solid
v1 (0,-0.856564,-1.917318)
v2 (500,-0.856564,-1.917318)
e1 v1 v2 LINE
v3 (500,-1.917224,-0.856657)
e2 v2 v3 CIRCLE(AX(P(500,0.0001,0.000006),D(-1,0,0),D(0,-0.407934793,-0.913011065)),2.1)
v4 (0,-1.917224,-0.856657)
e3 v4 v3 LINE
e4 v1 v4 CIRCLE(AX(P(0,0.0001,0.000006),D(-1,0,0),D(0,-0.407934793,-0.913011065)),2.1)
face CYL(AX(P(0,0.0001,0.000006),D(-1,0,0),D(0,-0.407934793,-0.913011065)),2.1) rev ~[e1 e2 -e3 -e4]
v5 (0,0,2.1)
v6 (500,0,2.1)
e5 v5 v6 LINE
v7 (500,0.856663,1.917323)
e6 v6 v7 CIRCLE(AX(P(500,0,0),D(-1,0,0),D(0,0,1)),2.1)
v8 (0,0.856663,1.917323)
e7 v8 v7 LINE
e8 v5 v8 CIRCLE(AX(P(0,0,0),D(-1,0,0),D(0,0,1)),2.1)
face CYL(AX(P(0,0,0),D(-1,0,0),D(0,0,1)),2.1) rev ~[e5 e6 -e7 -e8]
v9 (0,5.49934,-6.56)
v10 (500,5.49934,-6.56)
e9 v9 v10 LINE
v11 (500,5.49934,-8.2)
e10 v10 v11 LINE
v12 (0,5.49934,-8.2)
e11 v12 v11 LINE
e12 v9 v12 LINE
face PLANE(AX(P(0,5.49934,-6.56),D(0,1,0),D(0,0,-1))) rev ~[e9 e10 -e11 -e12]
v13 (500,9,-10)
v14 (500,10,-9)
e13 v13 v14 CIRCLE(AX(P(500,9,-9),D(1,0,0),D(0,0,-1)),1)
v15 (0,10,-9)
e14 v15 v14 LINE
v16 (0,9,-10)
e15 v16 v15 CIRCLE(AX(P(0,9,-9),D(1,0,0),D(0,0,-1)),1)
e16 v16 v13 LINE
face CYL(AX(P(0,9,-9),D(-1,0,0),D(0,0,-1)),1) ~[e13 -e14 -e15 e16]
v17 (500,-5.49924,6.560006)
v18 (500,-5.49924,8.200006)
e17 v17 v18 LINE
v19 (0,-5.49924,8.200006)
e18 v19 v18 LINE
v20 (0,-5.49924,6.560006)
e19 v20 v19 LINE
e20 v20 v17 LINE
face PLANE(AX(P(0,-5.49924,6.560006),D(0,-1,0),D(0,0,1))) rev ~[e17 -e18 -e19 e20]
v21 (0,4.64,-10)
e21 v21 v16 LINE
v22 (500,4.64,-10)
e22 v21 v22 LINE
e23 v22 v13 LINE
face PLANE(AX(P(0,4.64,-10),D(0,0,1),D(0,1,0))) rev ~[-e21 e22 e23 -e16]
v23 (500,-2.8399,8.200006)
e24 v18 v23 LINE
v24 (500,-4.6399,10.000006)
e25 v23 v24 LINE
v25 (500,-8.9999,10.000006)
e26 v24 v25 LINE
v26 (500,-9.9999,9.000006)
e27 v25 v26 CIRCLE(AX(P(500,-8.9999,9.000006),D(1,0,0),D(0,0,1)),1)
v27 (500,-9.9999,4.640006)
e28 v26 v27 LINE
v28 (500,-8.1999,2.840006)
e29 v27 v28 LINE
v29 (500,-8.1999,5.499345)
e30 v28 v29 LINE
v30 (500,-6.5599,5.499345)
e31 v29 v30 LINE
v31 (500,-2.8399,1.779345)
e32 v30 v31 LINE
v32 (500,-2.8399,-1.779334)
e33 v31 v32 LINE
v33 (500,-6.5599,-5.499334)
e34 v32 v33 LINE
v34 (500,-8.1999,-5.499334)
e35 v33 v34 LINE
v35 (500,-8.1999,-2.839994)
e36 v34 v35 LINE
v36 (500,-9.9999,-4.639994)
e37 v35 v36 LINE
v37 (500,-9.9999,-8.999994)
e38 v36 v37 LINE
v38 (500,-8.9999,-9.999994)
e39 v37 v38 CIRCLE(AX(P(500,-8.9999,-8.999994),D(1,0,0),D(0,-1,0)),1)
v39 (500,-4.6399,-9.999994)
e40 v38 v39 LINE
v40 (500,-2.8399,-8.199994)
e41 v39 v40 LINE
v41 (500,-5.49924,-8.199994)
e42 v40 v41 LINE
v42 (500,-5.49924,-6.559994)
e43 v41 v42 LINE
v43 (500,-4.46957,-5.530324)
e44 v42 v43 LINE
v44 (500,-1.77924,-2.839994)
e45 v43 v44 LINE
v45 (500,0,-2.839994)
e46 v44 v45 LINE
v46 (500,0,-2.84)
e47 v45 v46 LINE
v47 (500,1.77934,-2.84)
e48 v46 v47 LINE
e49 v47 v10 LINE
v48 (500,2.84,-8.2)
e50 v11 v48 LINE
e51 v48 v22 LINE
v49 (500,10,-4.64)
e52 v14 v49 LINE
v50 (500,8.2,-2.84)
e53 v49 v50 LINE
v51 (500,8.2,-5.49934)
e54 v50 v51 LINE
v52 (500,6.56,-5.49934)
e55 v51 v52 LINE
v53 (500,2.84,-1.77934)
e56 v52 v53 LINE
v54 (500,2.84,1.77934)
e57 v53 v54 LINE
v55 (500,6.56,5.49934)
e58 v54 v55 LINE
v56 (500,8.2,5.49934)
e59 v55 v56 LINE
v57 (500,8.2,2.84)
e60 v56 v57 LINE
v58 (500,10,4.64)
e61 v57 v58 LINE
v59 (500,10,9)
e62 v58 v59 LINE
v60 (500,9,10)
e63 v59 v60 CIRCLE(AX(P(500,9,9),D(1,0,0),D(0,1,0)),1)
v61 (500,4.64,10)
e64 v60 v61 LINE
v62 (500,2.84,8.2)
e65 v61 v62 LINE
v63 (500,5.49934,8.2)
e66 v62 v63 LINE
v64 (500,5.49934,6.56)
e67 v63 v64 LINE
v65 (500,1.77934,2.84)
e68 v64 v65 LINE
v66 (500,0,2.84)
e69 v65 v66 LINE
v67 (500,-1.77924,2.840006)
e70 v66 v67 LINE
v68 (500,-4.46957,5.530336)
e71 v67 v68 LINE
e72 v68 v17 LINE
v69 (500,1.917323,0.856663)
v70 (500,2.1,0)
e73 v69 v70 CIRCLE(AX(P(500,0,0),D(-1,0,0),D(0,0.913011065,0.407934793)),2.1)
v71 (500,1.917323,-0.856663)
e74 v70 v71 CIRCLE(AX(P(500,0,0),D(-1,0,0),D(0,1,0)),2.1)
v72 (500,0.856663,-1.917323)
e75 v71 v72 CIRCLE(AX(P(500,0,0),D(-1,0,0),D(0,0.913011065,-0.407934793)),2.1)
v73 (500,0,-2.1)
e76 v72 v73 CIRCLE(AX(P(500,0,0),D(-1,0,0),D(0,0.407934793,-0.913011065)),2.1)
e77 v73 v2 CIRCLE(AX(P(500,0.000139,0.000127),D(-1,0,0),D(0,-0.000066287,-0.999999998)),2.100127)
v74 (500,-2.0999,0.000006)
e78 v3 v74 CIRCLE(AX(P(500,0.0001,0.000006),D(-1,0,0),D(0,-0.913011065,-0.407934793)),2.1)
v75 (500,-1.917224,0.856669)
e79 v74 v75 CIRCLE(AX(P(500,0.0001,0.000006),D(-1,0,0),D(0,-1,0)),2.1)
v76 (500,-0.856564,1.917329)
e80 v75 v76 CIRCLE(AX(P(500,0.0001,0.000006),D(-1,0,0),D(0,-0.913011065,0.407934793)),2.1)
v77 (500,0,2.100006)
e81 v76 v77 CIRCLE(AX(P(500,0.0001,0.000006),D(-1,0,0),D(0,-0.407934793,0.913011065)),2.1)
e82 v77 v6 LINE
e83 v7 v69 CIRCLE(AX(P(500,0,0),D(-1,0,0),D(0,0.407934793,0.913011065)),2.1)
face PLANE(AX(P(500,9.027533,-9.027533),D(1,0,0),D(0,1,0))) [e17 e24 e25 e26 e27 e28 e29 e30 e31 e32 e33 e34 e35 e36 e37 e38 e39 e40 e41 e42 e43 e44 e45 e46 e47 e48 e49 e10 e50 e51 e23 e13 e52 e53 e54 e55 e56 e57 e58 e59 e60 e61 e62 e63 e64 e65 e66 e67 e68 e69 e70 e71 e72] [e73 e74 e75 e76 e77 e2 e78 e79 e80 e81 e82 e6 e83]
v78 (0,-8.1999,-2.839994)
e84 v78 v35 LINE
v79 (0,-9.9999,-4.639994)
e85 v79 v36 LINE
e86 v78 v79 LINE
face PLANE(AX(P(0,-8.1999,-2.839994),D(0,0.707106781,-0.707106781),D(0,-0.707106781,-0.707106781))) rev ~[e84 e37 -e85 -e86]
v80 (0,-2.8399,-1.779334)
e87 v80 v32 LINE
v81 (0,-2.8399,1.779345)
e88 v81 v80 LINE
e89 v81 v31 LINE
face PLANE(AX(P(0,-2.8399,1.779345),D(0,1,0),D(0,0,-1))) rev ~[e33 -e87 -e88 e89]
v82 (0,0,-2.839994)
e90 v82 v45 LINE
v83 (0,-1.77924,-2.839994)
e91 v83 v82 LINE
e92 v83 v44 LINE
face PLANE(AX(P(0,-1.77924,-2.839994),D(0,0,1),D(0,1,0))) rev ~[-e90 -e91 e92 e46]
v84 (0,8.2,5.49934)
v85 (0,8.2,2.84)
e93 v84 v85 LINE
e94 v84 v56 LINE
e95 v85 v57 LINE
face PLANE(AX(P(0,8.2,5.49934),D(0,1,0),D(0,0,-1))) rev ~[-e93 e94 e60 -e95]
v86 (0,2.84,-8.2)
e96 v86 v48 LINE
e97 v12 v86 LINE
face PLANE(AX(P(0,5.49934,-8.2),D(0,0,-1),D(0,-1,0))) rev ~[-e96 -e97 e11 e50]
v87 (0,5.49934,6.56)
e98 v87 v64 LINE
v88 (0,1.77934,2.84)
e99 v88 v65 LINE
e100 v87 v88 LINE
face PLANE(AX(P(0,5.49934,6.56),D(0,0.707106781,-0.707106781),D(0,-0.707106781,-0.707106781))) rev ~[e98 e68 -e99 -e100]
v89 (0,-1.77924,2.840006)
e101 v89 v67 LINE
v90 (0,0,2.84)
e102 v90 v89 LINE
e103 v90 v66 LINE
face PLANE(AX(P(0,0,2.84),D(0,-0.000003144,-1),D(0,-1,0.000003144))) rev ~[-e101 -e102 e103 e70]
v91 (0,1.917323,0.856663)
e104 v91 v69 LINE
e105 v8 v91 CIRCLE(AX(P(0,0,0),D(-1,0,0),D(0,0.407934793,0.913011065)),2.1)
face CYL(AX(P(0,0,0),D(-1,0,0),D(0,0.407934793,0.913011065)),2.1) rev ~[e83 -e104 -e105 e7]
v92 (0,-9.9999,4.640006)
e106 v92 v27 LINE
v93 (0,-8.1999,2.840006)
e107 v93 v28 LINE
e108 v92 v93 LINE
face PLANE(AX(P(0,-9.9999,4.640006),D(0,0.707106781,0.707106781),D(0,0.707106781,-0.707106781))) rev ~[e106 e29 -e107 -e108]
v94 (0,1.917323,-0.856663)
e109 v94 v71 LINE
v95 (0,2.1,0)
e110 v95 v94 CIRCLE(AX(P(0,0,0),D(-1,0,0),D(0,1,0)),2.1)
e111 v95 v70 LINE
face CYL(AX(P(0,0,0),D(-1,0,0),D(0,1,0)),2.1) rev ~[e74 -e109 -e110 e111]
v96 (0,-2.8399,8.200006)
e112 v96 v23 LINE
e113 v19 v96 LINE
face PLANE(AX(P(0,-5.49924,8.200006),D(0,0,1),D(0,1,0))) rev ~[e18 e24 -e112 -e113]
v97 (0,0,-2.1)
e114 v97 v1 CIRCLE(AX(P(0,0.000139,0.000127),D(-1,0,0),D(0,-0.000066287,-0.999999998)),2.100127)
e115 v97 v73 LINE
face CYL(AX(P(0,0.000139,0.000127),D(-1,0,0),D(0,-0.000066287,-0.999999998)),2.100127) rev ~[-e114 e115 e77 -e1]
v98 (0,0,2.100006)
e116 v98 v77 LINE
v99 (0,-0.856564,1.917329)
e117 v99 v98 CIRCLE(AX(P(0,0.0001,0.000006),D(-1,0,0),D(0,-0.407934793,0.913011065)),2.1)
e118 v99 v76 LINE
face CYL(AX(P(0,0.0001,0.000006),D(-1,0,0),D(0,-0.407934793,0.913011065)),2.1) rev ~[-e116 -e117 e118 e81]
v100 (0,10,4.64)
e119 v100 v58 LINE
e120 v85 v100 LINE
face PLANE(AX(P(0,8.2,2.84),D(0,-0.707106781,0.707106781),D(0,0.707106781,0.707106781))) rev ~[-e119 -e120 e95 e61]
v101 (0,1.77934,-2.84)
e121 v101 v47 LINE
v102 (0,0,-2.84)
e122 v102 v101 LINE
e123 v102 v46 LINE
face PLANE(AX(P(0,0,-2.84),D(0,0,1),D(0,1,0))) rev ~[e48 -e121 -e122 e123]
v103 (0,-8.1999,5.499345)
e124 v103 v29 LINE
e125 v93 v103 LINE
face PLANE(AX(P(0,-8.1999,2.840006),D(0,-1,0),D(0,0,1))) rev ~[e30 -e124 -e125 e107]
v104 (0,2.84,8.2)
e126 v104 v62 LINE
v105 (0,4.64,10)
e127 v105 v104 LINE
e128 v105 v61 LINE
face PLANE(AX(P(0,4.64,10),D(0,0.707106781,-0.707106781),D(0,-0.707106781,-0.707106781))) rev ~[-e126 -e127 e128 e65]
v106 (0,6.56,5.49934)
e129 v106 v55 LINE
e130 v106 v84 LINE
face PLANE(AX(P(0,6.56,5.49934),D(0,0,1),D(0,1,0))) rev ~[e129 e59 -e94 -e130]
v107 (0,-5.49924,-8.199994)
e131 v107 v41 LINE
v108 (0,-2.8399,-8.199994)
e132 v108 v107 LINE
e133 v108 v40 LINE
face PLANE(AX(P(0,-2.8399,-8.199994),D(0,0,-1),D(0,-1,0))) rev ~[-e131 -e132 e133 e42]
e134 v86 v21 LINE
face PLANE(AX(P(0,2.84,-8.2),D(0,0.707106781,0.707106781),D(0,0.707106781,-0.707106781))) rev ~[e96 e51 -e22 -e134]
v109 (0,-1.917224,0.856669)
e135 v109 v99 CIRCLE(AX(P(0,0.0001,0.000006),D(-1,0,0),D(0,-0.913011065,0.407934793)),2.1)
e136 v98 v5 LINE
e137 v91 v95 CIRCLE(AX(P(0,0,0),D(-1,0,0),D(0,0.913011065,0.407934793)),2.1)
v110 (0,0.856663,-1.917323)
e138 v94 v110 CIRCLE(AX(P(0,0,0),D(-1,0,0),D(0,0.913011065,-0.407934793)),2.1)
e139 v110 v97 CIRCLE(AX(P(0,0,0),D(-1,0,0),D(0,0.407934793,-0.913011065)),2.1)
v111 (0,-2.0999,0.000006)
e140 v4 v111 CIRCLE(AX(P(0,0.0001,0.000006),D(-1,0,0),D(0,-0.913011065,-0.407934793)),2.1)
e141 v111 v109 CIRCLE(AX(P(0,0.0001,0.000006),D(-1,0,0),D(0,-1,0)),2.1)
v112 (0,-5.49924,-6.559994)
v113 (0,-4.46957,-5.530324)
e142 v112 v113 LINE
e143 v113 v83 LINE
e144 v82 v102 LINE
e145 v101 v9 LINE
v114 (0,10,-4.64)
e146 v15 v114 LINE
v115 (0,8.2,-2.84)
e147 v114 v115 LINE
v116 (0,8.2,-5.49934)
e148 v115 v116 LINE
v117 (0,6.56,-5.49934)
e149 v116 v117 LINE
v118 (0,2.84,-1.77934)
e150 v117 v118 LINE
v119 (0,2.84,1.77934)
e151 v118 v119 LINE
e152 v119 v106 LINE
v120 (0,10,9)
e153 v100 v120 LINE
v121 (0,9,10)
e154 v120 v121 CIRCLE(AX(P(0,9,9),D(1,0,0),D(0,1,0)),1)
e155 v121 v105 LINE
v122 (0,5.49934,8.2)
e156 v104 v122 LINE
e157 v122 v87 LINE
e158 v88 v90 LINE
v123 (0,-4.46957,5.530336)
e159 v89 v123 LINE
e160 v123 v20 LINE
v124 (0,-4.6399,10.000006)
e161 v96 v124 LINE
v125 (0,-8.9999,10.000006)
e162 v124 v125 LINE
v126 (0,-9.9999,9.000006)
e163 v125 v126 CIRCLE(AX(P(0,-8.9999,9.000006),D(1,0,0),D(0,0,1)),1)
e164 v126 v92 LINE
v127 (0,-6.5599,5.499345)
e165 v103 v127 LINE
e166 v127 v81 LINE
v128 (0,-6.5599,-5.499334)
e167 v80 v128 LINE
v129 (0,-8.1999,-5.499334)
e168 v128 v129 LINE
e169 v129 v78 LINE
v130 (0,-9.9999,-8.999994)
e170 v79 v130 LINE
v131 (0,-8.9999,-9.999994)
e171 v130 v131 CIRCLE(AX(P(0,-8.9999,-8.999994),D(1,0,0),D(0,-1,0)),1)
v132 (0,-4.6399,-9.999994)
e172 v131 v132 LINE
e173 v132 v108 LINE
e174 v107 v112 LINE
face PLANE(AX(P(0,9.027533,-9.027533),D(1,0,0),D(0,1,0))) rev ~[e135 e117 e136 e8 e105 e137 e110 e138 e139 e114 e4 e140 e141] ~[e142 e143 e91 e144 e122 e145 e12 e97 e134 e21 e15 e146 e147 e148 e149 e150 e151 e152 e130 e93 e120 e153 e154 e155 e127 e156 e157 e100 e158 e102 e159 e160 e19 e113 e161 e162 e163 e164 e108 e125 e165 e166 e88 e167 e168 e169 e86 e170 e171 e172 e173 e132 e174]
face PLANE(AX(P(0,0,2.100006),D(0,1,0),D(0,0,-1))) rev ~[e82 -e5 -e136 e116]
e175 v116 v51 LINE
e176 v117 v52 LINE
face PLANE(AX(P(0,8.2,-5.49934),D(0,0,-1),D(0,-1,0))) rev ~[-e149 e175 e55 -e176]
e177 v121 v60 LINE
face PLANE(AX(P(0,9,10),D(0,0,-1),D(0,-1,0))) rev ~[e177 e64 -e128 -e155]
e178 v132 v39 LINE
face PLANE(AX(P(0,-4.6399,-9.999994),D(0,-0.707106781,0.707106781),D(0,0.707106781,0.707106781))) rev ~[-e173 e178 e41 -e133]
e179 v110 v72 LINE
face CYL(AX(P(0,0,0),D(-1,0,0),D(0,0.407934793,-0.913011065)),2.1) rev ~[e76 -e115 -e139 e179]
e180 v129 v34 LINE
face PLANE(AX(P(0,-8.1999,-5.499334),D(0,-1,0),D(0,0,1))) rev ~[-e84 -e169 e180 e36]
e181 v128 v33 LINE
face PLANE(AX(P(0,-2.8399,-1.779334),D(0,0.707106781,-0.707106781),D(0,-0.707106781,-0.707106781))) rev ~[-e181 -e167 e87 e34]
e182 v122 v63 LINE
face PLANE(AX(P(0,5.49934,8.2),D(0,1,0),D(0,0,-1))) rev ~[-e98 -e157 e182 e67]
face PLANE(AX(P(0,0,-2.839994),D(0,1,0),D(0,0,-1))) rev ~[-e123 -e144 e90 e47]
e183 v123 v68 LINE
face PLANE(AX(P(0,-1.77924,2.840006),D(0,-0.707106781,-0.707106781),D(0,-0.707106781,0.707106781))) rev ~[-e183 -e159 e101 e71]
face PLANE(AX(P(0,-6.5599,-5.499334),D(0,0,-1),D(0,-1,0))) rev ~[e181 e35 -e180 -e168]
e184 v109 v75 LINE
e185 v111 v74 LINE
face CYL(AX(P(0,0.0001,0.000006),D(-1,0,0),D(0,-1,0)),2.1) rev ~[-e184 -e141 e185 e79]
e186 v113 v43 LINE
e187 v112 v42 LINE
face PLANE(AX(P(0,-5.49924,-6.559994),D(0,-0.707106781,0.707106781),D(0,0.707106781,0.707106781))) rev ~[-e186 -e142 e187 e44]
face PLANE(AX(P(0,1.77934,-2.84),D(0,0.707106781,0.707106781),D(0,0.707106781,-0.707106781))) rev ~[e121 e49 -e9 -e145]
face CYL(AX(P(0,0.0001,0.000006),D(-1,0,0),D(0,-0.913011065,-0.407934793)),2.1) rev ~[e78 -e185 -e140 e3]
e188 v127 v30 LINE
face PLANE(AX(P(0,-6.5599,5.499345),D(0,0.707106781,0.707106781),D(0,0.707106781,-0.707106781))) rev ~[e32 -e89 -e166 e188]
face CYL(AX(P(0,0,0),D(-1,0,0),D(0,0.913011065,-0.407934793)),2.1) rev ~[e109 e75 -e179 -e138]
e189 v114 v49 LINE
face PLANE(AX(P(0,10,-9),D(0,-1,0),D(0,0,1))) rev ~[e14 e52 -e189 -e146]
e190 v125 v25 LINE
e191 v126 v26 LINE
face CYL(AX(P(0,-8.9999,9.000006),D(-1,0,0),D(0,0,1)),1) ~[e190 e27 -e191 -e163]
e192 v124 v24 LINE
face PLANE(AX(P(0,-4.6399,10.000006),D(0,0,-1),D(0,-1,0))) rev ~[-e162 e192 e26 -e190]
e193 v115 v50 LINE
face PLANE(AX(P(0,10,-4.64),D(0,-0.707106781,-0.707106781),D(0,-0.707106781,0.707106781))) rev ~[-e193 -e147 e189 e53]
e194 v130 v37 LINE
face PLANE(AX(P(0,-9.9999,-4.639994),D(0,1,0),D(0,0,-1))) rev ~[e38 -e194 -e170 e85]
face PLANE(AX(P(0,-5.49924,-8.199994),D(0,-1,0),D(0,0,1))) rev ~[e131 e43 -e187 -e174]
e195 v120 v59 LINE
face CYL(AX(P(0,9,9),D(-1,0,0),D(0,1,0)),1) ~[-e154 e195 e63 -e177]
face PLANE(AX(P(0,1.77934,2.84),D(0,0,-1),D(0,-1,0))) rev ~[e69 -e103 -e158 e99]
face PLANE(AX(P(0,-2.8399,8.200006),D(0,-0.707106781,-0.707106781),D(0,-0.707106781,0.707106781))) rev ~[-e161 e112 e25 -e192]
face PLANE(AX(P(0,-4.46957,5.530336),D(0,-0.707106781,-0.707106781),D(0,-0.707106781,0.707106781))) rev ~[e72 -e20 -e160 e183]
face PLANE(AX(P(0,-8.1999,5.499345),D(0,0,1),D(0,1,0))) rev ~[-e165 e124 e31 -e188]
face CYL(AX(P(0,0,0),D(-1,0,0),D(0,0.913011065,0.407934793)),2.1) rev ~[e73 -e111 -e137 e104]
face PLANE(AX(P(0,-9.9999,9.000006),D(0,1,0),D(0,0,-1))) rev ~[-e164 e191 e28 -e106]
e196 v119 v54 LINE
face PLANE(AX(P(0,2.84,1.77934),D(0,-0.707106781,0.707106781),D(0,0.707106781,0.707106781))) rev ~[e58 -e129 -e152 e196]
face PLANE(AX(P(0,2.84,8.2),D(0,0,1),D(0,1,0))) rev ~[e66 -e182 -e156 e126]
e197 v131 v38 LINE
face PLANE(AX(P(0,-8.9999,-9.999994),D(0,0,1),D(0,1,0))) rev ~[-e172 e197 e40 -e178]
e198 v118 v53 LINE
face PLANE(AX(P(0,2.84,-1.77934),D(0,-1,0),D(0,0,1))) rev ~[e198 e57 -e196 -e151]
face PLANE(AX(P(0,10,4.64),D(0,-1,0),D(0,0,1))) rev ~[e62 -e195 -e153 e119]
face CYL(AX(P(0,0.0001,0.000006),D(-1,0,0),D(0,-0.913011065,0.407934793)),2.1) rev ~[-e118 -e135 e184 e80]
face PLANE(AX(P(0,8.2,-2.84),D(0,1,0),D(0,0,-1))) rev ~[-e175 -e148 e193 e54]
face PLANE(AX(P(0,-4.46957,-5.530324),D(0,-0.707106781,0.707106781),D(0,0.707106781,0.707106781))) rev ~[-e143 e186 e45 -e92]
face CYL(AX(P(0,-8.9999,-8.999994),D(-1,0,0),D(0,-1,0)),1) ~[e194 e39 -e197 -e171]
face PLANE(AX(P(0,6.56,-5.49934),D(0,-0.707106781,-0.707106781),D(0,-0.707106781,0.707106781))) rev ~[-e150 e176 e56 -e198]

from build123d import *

# Parameters (mm, degrees)
F1_DEPTH = 500


# Not quite as in the source:
# - ends of sketch curves that miss each other by under 0.0002 mm in the source are joined


with BuildPart() as f1:
    # F0 (on Right) → F1 (new body)
    with BuildSketch(Plane.YZ):
        with BuildLine():
            Line((8.2, -10), (9, -10))
            ThreePointArc((9, -10), (9.7071067812, -9.7071067812), (10, -9))
            Line((10, -9), (10, -8.2))
            Line((10, -8.2), (8.2, -8.2))
            Line((8.2, -8.2), (8.2, -10))
        make_face()
        Polygon((5.4993398282, -8.2), (7.1393398282, -8.2), (5.4993398282, -6.56), align=None)
        Polygon((6.56, -5.4993398282), (8.2, -7.1393398282), (8.2, -5.4993398282), align=None)
        with BuildLine():
            Line((8.2, 10), (8.2, 8.2))
            Line((8.2, 8.2), (10, 8.2))
            Line((10, 8.2), (10, 9))
            ThreePointArc((10, 9), (9.7071067812, 9.7071067812), (9, 10))
            Line((9, 10), (8.2, 10))
        make_face()
        Polygon((8.2, 7.1393398282), (6.56, 5.4993398282), (8.2, 5.4993398282), align=None)
        Polygon((5.4993398282, 8.2), (5.4993398282, 6.56), (7.1393398282, 8.2), align=None)
        with BuildLine():
            Line((-9.9999004684, 8.2000055944), (-8.1999004684, 8.2000055944))
            Line((-8.1999004684, 8.2000055944), (-8.1999004684, 10.0000055944))
            Line((-8.1999004684, 10.0000055944), (-8.9999004684, 10.0000055944))
            ThreePointArc((-8.9999004684, 10.0000055944), (-9.7070072496, 9.7071123756), (-9.9999004684, 9.0000055944))
            Line((-9.9999004684, 9.0000055944), (-9.9999004684, 8.2000055944))
        make_face()
        Polygon((-7.1392402967, 8.2000055944), (-5.4992402967, 6.5600055944), (-5.4992402967, 8.2000055944), align=None)
        Polygon((-8.1999004684, 5.4993454226), (-6.5599004684, 5.4993454226), (-8.1999004684, 7.1393454226), align=None)
        with BuildLine():
            Line((-8.1999004684, -9.9999944056), (-8.1999004684, -8.1999944056))
            Line((-8.1999004684, -8.1999944056), (-9.9999004684, -8.1999944056))
            Line((-9.9999004684, -8.1999944056), (-9.9999004684, -8.9999944056))
            ThreePointArc((-9.9999004684, -8.9999944056), (-9.7070072496, -9.7071011868), (-8.9999004684, -9.9999944056))
            Line((-8.9999004684, -9.9999944056), (-8.1999004684, -9.9999944056))
        make_face()
        Polygon((-8.1999004684, -7.1393342338), (-6.5599004684, -5.4993342338), (-8.1999004684, -5.4993342338), align=None)
        Polygon((-5.4992402967, -8.1999944056), (-5.4992402967, -6.5599944056), (-7.1392402967, -8.1999944056), align=None)
        with BuildLine():
            Line((1.9173232366, -0.8566630648), (2.84, -1.7793398282))
            Line((2.84, -1.7793398282), (2.84, 0))
            Line((2.84, 0), (2.1, 0))
            ThreePointArc((2.1, 0), (2.0538231176, -0.4379618723), (1.9173232366, -0.8566630648))
        make_face()
        with BuildLine():
            Line((0, -2.84), (1.7793398282, -2.84))
            Line((1.7793398282, -2.84), (0.8566630648, -1.9173232366))
            ThreePointArc((0.8566630648, -1.9173232366), (0.4379618723, -2.0538231176), (0, -2.1))
            Line((0, -2.1), (0, -2.84))
        make_face()
        with BuildLine():
            Line((-1.7792402967, -2.8399944056), (9.95316e-05, -2.8399944056))
            Line((9.95316e-05, -2.8399944056), (0, -2.1))
            ThreePointArc((0, -2.1), (-0.4378623408, -2.0538175232), (-0.8565635332, -1.9173176422))
            Line((-0.8565635332, -1.9173176422), (-1.7792402967, -2.8399944056))
        make_face()
        Polygon((4.64, -10), (8.2, -10), (8.2, -8.2), (7.1393398282, -8.2), (5.4993398282, -8.2), (2.84, -8.2), align=None)
        Polygon((8.2, -8.2), (10, -8.2), (10, -4.64), (8.2, -2.84), (8.2, -5.4993398282), (8.2, -7.1393398282), align=None)
        with BuildLine():
            ThreePointArc((0, 2.1), (0.4379618723, 2.0538231176), (0.8566630648, 1.9173232366))
            Line((0.8566630648, 1.9173232366), (1.7793398282, 2.84))
            Line((1.7793398282, 2.84), (0, 2.84))
            Line((0, 2.84), (0, 2.1))
        make_face()
        with BuildLine():
            Line((2.1, 0), (2.84, 0))
            Line((2.84, 0), (2.84, 1.7793398282))
            Line((2.84, 1.7793398282), (1.9173232366, 0.8566630648))
            ThreePointArc((1.9173232366, 0.8566630648), (2.0538231176, 0.4379618723), (2.1, 0))
        make_face()
        with BuildLine():
            ThreePointArc((-0.8565635332, 1.917328831), (-0.4378623408, 2.053828712), (9.95316e-05, 2.1000055944))
            Line((9.95316e-05, 2.1000055944), (0, 2.84))
            Line((0, 2.84), (-1.7792402967, 2.8400055944))
            Line((-1.7792402967, 2.8400055944), (-0.8565635332, 1.917328831))
        make_face()
        Polygon((8.2, 8.2), (8.2, 7.1393398282), (8.2, 5.4993398282), (8.2, 2.84), (10, 4.64), (10, 8.2), align=None)
        Polygon((7.1393398282, 8.2), (8.2, 8.2), (8.2, 10), (4.64, 10), (2.84, 8.2), (5.4993398282, 8.2), align=None)
        with BuildLine():
            Line((-2.8399004684, 1.7793454226), (-2.8399004684, 5.5944e-06))
            Line((-2.8399004684, 5.5944e-06), (-2.0999004684, 5.5944e-06))
            ThreePointArc((-2.0999004684, 5.5944e-06), (-2.053723586, 0.4379674667), (-1.917223705, 0.8566686592))
            Line((-1.917223705, 0.8566686592), (-2.8399004684, 1.7793454226))
        make_face()
        Polygon((-8.1999004684, 10.0000055944), (-8.1999004684, 8.2000055944), (-7.1392402967, 8.2000055944), (-5.4992402967, 8.2000055944), (-2.8399004684, 8.2000055944), (-4.6399004684, 10.0000055944), align=None)
        Polygon((-8.1999004684, 5.4993454226), (-8.1999004684, 7.1393454226), (-8.1999004684, 8.2000055944), (-9.9999004684, 8.2000055944), (-9.9999004684, 4.6400055944), (-8.1999004684, 2.8400055944), align=None)
        with BuildLine():
            Line((-2.8399004684, 5.5944e-06), (-2.8399004684, -1.7793342338))
            Line((-2.8399004684, -1.7793342338), (-1.917223705, -0.8566574704))
            ThreePointArc((-1.917223705, -0.8566574704), (-2.053723586, -0.4379562779), (-2.0999004684, 5.5944e-06))
            Line((-2.0999004684, 5.5944e-06), (-2.8399004684, 5.5944e-06))
        make_face()
        Polygon((-9.9999004684, -8.1999944056), (-8.1999004684, -8.1999944056), (-8.1999004684, -7.1393342338), (-8.1999004684, -5.4993342338), (-8.1999004684, -2.8399944056), (-9.9999004684, -4.6399944056), align=None)
        Polygon((-5.4992402967, -8.1999944056), (-7.1392402967, -8.1999944056), (-8.1999004684, -8.1999944056), (-8.1999004684, -9.9999944056), (-4.6399004684, -9.9999944056), (-2.8399004684, -8.1999944056), align=None)
        with BuildLine():
            Line((-2.8399004684, -1.7793342338), (-1.7792402967, -2.8399944056))
            Line((-1.7792402967, -2.8399944056), (-0.8565635332, -1.9173176422))
            ThreePointArc((-0.8565635332, -1.9173176422), (-1.4848247089, -1.4849186461), (-1.917223705, -0.8566574704))
            Line((-1.917223705, -0.8566574704), (-2.8399004684, -1.7793342338))
        make_face()
        Polygon((-4.4695703825, -5.5303244915), (-1.7792402967, -2.8399944056), (-2.8399004684, -1.7793342338), (-5.5302305543, -4.4696643197), (-6.5599004684, -5.4993342338), (-8.1999004684, -7.1393342338), (-8.1999004684, -8.1999944056), (-7.1392402967, -8.1999944056), (-5.4992402967, -6.5599944056), align=None)
        with BuildLine():
            Line((7.1393398282, -8.2), (8.2, -8.2))
            Line((8.2, -8.2), (8.2, -7.1393398282))
            Line((8.2, -7.1393398282), (6.56, -5.4993398282))
            Line((6.56, -5.4993398282), (5.5303300859, -4.4696699141))
            Line((5.5303300859, -4.4696699141), (2.84, -1.7793398282))
            Line((2.84, -1.7793398282), (1.9173232366, -0.8566630648))
            ThreePointArc((1.9173232366, -0.8566630648), (1.4849242405, -1.4849242405), (0.8566630648, -1.9173232366))
            Line((0.8566630648, -1.9173232366), (1.7793398282, -2.84))
            Line((1.7793398282, -2.84), (4.4696699141, -5.5303300859))
            Line((4.4696699141, -5.5303300859), (5.4993398282, -6.56))
            Line((5.4993398282, -6.56), (7.1393398282, -8.2))
        make_face()
        with BuildLine():
            Line((1.9173232366, 0.8566630648), (2.84, 1.7793398282))
            Line((2.84, 1.7793398282), (5.5303300859, 4.4696699141))
            Line((5.5303300859, 4.4696699141), (6.56, 5.4993398282))
            Line((6.56, 5.4993398282), (8.2, 7.1393398282))
            Line((8.2, 7.1393398282), (8.2, 8.2))
            Line((8.2, 8.2), (7.1393398282, 8.2))
            Line((7.1393398282, 8.2), (5.4993398282, 6.56))
            Line((5.4993398282, 6.56), (4.4696699141, 5.5303300859))
            Line((4.4696699141, 5.5303300859), (1.7793398282, 2.84))
            Line((1.7793398282, 2.84), (0.8566630648, 1.9173232366))
            ThreePointArc((0.8566630648, 1.9173232366), (1.4849242405, 1.4849242405), (1.9173232366, 0.8566630648))
        make_face()
        with BuildLine():
            Line((-5.5302305543, 4.4696755085), (-2.8399004684, 1.7793454226))
            Line((-2.8399004684, 1.7793454226), (-1.917223705, 0.8566686592))
            ThreePointArc((-1.917223705, 0.8566686592), (-1.4848247089, 1.4849298349), (-0.8565635332, 1.917328831))
            Line((-0.8565635332, 1.917328831), (-1.7792402967, 2.8400055944))
            Line((-1.7792402967, 2.8400055944), (-4.4695703825, 5.5303356803))
            Line((-4.4695703825, 5.5303356803), (-5.4992402967, 6.5600055944))
            Line((-5.4992402967, 6.5600055944), (-7.1392402967, 8.2000055944))
            Line((-7.1392402967, 8.2000055944), (-8.1999004684, 8.2000055944))
            Line((-8.1999004684, 8.2000055944), (-8.1999004684, 7.1393454226))
            Line((-8.1999004684, 7.1393454226), (-6.5599004684, 5.4993454226))
            Line((-6.5599004684, 5.4993454226), (-5.5302305543, 4.4696755085))
        make_face()
    extrude(amount=F1_DEPTH)


solid = f1.part
